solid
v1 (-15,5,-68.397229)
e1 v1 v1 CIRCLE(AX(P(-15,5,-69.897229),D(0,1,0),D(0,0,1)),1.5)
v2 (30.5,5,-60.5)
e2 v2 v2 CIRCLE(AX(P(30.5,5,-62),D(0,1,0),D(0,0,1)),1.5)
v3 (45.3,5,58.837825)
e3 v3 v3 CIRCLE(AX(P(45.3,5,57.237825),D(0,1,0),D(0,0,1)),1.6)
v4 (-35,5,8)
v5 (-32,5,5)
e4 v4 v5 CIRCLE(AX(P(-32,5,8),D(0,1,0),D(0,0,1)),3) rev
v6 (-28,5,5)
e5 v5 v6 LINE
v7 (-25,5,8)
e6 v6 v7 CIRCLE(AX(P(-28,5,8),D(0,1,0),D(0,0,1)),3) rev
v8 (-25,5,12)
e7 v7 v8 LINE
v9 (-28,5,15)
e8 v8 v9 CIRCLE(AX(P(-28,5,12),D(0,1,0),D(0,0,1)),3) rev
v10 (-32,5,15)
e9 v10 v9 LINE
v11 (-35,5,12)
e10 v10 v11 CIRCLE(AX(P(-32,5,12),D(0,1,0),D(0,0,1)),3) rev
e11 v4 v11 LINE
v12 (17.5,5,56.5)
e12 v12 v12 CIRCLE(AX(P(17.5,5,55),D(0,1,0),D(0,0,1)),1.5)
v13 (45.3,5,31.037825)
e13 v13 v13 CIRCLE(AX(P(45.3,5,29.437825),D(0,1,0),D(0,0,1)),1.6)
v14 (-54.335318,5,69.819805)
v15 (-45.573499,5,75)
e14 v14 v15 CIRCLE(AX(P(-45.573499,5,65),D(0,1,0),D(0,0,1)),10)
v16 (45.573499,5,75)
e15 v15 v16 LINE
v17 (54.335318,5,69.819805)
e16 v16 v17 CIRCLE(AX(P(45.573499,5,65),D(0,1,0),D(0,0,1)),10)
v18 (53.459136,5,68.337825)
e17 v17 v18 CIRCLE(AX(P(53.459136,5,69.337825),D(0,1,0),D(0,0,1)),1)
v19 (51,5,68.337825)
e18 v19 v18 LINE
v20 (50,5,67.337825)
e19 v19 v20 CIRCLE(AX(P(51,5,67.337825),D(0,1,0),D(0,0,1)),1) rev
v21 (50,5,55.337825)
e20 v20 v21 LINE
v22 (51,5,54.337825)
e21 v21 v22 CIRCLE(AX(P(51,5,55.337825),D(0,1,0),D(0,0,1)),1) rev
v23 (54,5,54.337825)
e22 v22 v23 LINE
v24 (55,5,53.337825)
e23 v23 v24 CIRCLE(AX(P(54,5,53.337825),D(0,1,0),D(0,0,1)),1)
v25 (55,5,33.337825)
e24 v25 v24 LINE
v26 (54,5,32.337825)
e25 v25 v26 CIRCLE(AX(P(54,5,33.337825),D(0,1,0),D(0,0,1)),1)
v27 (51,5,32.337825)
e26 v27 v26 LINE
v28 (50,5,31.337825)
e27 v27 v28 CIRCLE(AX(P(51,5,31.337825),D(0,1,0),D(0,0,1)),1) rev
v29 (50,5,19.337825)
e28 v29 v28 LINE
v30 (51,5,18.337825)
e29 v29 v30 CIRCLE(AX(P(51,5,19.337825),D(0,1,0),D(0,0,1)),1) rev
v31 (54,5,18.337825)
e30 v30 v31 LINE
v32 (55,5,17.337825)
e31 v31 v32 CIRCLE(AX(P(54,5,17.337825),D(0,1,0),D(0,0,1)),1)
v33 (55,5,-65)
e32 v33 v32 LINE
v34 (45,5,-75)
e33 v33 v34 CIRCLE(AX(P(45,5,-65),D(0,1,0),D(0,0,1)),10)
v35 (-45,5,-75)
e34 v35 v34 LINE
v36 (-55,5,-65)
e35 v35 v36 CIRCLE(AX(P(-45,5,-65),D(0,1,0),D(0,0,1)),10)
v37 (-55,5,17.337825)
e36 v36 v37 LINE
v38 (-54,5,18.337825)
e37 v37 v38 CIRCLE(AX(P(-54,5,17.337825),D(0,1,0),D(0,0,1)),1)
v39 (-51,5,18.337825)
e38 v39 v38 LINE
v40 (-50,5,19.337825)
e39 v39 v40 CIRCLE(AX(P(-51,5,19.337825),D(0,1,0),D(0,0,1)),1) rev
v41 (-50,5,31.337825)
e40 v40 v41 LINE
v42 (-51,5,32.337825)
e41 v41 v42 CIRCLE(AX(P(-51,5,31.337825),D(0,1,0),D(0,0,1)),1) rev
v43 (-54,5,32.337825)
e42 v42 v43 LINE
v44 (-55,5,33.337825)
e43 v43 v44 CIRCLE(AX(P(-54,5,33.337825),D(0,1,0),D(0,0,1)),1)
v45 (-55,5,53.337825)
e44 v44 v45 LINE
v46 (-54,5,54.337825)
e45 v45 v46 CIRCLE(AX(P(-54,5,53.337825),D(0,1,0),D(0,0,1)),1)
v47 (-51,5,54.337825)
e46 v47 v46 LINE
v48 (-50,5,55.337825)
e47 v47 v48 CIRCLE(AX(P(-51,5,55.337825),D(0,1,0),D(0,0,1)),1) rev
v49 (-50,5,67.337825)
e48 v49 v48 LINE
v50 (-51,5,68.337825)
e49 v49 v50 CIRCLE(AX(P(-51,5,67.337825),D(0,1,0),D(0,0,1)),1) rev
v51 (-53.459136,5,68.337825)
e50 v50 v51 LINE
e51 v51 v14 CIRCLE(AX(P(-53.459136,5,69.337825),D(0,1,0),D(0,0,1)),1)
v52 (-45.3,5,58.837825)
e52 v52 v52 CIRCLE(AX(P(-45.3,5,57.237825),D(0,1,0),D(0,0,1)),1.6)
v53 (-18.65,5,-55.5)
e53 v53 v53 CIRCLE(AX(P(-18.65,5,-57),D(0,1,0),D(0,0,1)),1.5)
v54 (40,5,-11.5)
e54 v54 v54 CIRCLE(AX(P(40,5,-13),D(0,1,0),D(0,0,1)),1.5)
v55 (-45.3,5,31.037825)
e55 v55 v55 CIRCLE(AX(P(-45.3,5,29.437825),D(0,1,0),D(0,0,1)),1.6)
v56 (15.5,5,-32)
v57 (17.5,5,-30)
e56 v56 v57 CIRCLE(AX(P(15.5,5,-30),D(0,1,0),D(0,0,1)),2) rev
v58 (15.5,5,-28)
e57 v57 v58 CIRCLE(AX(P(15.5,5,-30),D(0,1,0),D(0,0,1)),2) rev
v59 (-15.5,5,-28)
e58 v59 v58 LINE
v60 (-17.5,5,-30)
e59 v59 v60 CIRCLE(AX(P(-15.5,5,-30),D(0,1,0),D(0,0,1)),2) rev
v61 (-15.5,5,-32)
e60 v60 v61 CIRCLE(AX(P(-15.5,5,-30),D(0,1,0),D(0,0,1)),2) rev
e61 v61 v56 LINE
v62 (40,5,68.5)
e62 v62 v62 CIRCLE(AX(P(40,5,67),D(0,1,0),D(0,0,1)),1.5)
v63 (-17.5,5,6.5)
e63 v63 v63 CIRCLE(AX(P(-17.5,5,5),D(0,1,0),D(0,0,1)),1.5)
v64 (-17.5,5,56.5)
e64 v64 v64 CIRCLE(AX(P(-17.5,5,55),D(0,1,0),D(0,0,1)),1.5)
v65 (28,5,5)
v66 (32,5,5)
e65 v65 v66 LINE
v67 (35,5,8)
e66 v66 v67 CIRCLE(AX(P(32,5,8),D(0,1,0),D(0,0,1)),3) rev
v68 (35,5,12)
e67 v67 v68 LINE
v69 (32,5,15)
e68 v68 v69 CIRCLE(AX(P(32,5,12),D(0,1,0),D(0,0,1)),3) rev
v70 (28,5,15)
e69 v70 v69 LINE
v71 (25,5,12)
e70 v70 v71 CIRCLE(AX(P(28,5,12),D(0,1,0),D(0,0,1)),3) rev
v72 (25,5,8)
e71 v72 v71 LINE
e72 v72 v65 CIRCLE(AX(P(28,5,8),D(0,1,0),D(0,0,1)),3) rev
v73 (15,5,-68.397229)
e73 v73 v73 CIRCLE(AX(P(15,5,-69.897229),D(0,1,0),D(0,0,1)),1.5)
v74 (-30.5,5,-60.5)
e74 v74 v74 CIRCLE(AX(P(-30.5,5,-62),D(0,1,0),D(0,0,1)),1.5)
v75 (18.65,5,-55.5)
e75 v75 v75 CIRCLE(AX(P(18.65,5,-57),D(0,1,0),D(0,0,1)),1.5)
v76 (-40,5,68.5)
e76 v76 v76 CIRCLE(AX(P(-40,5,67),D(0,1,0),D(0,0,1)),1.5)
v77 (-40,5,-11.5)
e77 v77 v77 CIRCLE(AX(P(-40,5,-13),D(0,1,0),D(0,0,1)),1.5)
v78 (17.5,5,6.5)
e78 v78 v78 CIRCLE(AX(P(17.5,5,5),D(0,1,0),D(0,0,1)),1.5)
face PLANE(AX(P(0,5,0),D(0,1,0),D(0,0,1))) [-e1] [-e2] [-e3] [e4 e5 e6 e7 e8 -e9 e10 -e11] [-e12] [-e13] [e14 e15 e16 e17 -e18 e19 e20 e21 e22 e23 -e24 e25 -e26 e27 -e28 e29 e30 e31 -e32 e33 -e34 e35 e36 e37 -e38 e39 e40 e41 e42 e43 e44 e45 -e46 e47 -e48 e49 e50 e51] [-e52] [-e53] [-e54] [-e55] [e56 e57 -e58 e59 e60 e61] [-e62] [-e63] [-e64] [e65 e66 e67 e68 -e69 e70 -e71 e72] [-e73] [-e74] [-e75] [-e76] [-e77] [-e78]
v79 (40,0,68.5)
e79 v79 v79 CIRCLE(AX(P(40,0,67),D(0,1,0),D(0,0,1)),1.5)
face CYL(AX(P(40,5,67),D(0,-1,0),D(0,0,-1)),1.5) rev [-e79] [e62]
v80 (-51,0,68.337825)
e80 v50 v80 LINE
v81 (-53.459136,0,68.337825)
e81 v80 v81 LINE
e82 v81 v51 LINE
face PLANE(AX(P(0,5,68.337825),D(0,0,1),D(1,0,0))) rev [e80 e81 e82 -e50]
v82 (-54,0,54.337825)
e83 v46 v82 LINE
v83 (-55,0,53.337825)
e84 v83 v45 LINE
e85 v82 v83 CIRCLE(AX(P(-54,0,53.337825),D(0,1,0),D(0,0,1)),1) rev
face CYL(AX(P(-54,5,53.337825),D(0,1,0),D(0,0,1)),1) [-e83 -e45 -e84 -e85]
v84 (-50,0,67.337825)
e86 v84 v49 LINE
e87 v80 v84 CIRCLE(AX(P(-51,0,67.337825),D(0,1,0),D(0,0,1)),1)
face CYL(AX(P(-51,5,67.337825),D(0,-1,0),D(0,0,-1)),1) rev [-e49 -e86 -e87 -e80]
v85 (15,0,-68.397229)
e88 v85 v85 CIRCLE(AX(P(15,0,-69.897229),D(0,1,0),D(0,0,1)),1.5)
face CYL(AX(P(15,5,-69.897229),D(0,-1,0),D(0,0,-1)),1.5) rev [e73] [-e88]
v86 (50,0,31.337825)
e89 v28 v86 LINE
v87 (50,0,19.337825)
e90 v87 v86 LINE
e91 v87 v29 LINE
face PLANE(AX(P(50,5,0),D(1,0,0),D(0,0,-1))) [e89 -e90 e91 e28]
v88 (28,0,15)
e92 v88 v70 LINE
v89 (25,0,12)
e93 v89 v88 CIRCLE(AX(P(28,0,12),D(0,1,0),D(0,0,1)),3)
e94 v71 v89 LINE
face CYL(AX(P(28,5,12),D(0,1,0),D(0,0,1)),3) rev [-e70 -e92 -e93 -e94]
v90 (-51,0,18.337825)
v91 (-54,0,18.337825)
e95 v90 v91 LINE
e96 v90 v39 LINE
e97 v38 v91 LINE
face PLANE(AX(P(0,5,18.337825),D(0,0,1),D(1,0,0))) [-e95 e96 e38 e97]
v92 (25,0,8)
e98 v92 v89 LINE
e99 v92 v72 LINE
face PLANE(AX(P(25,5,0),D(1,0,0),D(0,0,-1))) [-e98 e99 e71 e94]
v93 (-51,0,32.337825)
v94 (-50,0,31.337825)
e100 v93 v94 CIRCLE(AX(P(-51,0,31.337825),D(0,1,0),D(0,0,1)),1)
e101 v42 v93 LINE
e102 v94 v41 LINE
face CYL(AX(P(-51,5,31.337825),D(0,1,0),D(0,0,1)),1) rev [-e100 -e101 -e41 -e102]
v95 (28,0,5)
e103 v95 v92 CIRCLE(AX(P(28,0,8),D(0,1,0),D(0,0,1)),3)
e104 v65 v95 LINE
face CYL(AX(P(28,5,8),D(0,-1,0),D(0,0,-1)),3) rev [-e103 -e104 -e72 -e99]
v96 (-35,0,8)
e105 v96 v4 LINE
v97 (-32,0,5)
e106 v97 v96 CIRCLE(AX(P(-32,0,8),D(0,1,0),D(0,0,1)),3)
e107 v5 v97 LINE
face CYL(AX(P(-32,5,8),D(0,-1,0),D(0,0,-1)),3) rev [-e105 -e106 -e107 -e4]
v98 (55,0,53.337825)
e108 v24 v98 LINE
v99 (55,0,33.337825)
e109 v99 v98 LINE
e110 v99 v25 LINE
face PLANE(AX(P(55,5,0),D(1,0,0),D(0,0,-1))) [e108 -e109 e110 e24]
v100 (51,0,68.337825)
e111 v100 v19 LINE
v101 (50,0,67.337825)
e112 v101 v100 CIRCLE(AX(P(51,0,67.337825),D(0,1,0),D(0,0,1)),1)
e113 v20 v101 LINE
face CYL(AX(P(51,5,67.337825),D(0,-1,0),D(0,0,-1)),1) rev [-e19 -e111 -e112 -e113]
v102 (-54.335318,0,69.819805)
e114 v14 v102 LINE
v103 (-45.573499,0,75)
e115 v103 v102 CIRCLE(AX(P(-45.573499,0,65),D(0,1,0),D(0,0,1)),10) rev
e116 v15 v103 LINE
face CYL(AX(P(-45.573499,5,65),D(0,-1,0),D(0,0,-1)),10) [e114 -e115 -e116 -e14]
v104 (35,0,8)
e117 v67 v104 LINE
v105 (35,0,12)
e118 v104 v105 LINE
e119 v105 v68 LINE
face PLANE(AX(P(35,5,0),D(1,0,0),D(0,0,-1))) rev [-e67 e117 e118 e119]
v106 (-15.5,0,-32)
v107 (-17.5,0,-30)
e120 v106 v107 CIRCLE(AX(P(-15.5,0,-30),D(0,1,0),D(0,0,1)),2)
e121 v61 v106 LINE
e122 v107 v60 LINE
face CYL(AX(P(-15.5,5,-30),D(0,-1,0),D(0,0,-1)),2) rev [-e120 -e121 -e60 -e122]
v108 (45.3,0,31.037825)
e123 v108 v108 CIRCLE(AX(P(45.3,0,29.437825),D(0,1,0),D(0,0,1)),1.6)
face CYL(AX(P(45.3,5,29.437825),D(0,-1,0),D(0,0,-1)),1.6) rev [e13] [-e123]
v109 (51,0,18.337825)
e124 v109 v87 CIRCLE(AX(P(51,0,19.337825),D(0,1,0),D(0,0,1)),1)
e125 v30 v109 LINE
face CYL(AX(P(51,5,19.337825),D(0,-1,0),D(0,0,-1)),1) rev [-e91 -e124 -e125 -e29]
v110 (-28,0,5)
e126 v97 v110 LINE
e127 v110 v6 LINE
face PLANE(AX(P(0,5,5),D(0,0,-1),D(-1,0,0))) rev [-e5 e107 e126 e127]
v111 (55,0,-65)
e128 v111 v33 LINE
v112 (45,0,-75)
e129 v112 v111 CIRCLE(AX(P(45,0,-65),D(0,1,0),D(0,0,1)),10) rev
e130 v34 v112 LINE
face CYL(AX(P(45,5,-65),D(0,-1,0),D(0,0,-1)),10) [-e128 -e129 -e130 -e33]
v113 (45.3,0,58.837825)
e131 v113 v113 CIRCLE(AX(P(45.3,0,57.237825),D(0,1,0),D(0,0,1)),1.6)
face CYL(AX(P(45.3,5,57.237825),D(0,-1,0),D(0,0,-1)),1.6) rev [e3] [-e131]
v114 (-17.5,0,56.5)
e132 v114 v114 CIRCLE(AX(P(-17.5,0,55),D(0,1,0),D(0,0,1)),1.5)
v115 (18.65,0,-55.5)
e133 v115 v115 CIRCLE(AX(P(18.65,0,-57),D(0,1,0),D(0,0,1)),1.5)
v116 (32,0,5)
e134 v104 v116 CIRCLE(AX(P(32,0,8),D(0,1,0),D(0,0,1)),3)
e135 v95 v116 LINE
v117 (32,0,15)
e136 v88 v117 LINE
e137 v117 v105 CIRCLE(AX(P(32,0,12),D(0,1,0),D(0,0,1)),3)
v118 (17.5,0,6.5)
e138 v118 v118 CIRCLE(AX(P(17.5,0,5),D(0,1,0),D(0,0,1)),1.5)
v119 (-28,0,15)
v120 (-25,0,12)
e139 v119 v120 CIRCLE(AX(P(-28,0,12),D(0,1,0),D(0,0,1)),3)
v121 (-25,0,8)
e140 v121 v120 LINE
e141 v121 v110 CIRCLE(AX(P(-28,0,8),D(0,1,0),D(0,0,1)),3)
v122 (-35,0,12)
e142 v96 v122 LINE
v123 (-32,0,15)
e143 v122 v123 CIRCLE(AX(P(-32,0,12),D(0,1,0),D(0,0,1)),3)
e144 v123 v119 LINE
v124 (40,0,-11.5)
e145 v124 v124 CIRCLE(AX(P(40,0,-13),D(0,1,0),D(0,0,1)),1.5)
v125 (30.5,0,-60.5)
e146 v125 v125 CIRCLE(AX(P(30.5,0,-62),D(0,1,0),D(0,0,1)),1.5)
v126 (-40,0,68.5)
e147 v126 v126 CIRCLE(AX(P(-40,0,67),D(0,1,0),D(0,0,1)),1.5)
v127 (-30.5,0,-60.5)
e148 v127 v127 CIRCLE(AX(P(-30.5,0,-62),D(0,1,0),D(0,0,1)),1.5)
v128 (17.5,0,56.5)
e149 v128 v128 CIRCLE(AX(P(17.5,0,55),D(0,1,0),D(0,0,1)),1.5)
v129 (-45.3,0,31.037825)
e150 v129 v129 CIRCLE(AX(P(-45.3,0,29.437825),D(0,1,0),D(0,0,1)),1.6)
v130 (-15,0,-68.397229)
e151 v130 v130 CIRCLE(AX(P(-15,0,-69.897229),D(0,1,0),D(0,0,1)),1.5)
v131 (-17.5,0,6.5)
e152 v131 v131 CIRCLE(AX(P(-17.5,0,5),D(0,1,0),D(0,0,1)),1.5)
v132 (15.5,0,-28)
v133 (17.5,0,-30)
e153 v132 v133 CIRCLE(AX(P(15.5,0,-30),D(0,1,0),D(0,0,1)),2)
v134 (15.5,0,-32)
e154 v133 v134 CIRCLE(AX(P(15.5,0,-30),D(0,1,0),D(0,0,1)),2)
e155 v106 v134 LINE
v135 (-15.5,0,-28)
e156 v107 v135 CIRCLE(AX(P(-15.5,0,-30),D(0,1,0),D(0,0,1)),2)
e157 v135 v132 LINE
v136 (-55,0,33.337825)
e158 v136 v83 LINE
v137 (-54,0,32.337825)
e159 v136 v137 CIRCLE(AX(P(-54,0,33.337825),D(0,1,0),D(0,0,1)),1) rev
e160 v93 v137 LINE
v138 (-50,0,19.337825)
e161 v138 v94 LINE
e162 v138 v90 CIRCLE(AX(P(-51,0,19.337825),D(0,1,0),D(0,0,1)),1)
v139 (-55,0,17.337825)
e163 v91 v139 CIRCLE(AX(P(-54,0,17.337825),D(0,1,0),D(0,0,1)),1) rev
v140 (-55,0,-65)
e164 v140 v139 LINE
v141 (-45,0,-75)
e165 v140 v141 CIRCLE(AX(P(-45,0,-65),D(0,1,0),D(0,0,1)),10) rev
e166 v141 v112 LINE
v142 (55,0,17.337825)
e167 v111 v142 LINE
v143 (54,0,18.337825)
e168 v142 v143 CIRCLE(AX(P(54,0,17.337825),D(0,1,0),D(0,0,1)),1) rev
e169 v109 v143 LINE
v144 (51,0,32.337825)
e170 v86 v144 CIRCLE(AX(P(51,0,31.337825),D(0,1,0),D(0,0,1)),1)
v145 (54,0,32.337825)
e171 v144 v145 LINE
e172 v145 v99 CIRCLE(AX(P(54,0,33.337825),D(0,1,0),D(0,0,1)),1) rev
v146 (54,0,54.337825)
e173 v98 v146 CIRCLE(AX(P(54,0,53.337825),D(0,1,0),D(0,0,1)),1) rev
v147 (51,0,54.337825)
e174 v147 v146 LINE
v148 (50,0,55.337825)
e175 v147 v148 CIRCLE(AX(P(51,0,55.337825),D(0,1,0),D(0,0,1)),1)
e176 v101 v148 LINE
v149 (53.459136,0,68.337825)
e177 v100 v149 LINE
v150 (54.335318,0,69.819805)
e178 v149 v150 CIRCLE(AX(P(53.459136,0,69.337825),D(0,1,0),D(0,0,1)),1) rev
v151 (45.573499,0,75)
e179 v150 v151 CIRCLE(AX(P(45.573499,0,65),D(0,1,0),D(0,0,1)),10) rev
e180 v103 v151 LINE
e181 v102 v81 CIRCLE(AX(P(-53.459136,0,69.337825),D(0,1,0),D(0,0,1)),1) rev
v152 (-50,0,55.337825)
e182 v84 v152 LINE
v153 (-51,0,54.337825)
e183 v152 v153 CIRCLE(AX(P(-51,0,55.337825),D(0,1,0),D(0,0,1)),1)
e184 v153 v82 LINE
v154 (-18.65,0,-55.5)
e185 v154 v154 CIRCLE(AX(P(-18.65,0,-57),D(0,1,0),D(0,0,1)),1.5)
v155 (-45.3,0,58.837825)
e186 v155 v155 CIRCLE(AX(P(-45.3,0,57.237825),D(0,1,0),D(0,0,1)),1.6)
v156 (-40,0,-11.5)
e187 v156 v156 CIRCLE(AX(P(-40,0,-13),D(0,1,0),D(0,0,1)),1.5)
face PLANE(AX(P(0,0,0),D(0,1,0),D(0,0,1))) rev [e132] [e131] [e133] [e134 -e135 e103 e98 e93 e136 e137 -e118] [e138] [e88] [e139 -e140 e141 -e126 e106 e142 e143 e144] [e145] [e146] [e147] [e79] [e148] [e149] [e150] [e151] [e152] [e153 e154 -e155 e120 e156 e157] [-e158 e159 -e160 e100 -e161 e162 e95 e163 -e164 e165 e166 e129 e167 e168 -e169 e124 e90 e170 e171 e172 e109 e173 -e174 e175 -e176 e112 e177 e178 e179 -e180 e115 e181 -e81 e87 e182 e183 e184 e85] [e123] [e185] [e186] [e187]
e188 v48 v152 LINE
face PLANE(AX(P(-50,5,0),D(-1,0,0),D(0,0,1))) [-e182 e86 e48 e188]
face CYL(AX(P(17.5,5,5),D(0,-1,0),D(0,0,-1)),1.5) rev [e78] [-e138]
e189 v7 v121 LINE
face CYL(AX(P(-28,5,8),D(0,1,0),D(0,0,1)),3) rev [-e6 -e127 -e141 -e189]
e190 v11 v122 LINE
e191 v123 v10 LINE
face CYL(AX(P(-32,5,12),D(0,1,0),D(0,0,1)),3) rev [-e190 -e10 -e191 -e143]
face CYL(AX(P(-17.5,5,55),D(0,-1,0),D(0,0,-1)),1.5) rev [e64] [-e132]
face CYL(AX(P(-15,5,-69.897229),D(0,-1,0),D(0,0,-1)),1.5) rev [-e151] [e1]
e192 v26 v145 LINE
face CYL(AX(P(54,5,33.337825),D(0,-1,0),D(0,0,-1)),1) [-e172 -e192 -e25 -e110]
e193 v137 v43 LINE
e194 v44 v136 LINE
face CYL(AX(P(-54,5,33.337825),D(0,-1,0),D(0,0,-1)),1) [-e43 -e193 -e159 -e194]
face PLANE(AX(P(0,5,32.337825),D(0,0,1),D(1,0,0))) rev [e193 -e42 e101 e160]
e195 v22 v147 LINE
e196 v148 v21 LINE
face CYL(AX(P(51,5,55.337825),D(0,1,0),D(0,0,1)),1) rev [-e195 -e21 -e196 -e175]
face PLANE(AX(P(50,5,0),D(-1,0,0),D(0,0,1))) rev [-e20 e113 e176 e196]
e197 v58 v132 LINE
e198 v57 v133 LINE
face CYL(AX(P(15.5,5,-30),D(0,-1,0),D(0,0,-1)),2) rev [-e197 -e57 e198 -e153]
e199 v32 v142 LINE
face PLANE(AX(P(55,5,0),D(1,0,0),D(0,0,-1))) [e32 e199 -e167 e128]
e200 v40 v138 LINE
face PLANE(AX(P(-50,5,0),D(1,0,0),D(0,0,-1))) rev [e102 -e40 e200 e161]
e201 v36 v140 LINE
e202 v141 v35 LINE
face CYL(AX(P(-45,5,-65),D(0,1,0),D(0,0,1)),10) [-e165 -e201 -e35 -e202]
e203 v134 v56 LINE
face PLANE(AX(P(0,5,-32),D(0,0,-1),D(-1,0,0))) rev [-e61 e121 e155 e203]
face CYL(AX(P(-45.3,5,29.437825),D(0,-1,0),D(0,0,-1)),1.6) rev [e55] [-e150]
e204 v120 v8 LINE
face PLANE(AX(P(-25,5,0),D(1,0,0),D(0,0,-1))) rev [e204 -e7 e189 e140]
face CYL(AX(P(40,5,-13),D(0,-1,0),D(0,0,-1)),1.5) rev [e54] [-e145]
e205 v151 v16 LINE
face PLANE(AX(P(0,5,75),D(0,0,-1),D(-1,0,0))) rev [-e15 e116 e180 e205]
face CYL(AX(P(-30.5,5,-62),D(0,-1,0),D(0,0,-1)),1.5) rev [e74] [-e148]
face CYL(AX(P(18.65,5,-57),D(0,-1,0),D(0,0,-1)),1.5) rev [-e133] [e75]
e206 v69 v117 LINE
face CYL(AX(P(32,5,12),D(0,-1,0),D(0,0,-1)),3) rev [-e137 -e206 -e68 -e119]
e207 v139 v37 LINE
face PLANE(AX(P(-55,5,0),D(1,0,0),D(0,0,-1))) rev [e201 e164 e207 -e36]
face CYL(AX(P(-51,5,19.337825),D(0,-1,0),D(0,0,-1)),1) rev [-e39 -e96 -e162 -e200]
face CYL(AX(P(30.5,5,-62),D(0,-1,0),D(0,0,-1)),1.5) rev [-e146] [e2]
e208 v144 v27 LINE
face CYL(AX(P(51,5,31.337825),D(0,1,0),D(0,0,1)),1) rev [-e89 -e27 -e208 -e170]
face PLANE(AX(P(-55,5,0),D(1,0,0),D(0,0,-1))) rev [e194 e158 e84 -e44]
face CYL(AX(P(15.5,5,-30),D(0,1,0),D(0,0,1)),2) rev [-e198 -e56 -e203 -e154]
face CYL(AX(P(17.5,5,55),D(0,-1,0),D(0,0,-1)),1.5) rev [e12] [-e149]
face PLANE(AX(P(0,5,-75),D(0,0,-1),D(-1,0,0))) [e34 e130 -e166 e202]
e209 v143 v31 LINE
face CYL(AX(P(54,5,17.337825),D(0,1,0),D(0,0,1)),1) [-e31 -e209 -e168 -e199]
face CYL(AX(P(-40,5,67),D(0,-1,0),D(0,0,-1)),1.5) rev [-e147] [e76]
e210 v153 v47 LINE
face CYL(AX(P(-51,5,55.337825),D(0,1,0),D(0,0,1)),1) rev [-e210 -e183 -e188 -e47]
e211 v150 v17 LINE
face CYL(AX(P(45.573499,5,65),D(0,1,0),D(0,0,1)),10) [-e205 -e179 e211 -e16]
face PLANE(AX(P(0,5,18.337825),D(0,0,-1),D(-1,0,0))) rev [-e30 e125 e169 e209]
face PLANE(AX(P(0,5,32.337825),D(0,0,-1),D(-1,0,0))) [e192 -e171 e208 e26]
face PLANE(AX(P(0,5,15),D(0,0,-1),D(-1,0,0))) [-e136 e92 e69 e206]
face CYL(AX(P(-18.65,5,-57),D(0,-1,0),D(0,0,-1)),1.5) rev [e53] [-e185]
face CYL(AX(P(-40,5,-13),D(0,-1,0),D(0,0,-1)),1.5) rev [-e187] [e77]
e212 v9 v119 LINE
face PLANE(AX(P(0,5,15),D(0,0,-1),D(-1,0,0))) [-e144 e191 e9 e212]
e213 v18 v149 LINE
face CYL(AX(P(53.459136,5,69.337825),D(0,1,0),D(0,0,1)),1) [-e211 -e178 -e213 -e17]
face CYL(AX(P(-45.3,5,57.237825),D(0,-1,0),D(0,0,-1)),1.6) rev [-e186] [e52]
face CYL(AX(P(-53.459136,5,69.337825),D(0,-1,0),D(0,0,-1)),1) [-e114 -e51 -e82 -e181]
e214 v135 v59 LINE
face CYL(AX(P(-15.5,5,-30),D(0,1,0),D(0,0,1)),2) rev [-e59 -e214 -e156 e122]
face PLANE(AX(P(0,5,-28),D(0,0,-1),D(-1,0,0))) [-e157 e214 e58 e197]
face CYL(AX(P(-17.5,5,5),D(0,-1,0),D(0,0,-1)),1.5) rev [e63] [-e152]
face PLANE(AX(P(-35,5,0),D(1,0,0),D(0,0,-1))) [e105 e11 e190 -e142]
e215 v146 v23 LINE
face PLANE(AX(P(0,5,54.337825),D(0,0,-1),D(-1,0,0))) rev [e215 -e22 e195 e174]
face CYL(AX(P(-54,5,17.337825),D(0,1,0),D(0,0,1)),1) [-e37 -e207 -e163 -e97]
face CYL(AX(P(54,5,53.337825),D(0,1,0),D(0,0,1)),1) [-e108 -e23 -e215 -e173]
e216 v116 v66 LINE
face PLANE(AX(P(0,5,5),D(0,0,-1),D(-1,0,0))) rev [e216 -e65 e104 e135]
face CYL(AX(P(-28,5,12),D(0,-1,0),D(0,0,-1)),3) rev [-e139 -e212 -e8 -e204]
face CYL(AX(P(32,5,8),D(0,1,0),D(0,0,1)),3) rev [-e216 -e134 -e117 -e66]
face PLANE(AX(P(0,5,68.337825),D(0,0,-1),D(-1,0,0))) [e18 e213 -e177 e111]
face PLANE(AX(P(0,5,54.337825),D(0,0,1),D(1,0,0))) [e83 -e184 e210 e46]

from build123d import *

# Parameters (mm, degrees)
SKETCH1_R           = 1.6
SKETCH1_W           = 10
SKETCH1_H           = 10
SKETCH1_R_2         = 1.5
SKETCH1_W_2         = 35
SKETCH1_H_2         = 4
BOSS_EXTRUDE1_DEPTH = 5
FILLET1_R           = 10
FILLET2_R           = 2
FILLET3_R           = 3
FILLET4_R           = 1
FILLET5_R           = 1


# Some blends are built 0.0001 mm under size
with BuildPart() as part:
    # Sketch1 → Boss-Extrude1 (new body)
    with BuildSketch(Plane(origin=(0, 0, 0), x_dir=(1, 0, 0), z_dir=(0, 1, 0))):
        Polygon((55, 75), (-55, 75), (-55, -18.337824516), (-50, -18.337824516), (-50, -32.337824516), (-55, -32.337824516), (-55, -54.337824516), (-50, -54.337824516), (-50, -68.337824516), (-55, -68.337824516), (-55, -75), (55, -75), (55, -68.337824516), (50, -68.337824516), (50, -54.337824516), (55, -54.337824516), (55, -32.337824516), (50, -32.337824516), (50, -18.337824516), (55, -18.337824516), align=None)
        with Locations(Location((-45.3, -29.437824516, 0), (0, 0, 270))):
            Circle(SKETCH1_R, mode=Mode.SUBTRACT)
        with Locations((-30, -10)):
            Rectangle(SKETCH1_W, SKETCH1_H, mode=Mode.SUBTRACT)
        with Locations(Location((-17.5, -5, 0), (0, 0, 270))):
            Circle(SKETCH1_R_2, mode=Mode.SUBTRACT)
        with Locations(Location((17.5, -5, 0), (0, 0, 270))):
            Circle(SKETCH1_R_2, mode=Mode.SUBTRACT)
        with Locations(Location((45.3, -29.437824516, 0), (0, 0, 270))):
            Circle(SKETCH1_R, mode=Mode.SUBTRACT)
        with Locations((30, -10)):
            Rectangle(SKETCH1_W, SKETCH1_H, mode=Mode.SUBTRACT)
        with Locations(Location((-40, 13, 0), (0, 0, 270))):
            Circle(SKETCH1_R_2, mode=Mode.SUBTRACT)
        with Locations((0, 30)):
            Rectangle(SKETCH1_W_2, SKETCH1_H_2, mode=Mode.SUBTRACT)
        with Locations(Location((-30.5, 62, 0), (0, 0, 270))):
            Circle(SKETCH1_R_2, mode=Mode.SUBTRACT)
        with Locations(Location((-18.65, 57, 0), (0, 0, 270))):
            Circle(SKETCH1_R_2, mode=Mode.SUBTRACT)
        with Locations(Location((-15, 69.897229132, 0), (0, 0, 270))):
            Circle(SKETCH1_R_2, mode=Mode.SUBTRACT)
        with Locations(Location((40, 13, 0), (0, 0, 270))):
            Circle(SKETCH1_R_2, mode=Mode.SUBTRACT)
        with Locations(Location((18.65, 57, 0), (0, 0, 270))):
            Circle(SKETCH1_R_2, mode=Mode.SUBTRACT)
        with Locations(Location((15, 69.897229132, 0), (0, 0, 270))):
            Circle(SKETCH1_R_2, mode=Mode.SUBTRACT)
        with Locations(Location((30.5, 62, 0), (0, 0, 270))):
            Circle(SKETCH1_R_2, mode=Mode.SUBTRACT)
        with Locations(Location((-45.3, -57.237824516, 0), (0, 0, 270))):
            Circle(SKETCH1_R, mode=Mode.SUBTRACT)
        with Locations(Location((-40, -67, 0), (0, 0, 270))):
            Circle(SKETCH1_R_2, mode=Mode.SUBTRACT)
        with Locations(Location((-17.5, -55, 0), (0, 0, 270))):
            Circle(SKETCH1_R_2, mode=Mode.SUBTRACT)
        with Locations(Location((17.5, -55, 0), (0, 0, 270))):
            Circle(SKETCH1_R_2, mode=Mode.SUBTRACT)
        with Locations(Location((40, -67, 0), (0, 0, 270))):
            Circle(SKETCH1_R_2, mode=Mode.SUBTRACT)
        with Locations(Location((45.3, -57.237824516, 0), (0, 0, 270))):
            Circle(SKETCH1_R, mode=Mode.SUBTRACT)
    extrude(amount=BOSS_EXTRUDE1_DEPTH)

    # Fillet1
    # the kernel refuses this fillet: 10 mm, written as the material it takes off along each edge
    with BuildSketch(Plane(origin=(55, -23.566253348, 75), x_dir=(-1, 0, 0), z_dir=(0, 1, 0))) as fillet1_piece_1:
        with BuildLine():
            CenterArc((9.426501339, -10), FILLET1_R, 90, 70.501483543)
            Line((0, -6.662175484), (-0.188530027, -6.595418994))
            ThreePointArc((-0.188530027, -6.595418994), (-0.2, -3.331087742), (-0.2, 0))
            Line((-0.2, 0), (0, 0.2))
            Line((0, 0.2), (9.426501339, 0.2))
            Line((9.426501339, 0.2), (9.426501339, 0))
        make_face()
    extrude(amount=52.132506697, mode=Mode.SUBTRACT)
    with BuildSketch(Plane(origin=(-55, -23.566253348, 75), x_dir=(0, 0, -1), z_dir=(0, 1, 0))) as fillet1_piece_2:
        with BuildLine():
            CenterArc((10, -9.426501339), FILLET1_R, 109.498516457, 70.501483543)
            Line((0, -9.426501339), (-0.2, -9.426501339))
            Line((-0.2, -9.426501339), (-0.2, 0))
            Line((-0.2, 0), (0, 0.2))
            ThreePointArc((0, 0.2), (3.331087742, 0.2), (6.595418994, 0.188530027))
            Line((6.595418994, 0.188530027), (6.662175484, 0))
        make_face()
    extrude(amount=52.132506697, mode=Mode.SUBTRACT)
    with BuildSketch(Plane(origin=(-55, -25, -75), x_dir=(1, 0, 0), z_dir=(0, 1, 0)), Plane(origin=(55, -25, -75), x_dir=(0, 0, 1), z_dir=(0, 1, 0))) as fillet1_piece_3:
        with BuildLine():
            CenterArc((FILLET1_R, -FILLET1_R), FILLET1_R, 90, 90)
            Line((0, -FILLET1_R), (-FILLET1_R * 0.02, -FILLET1_R))
            Line((-FILLET1_R * 0.02, -FILLET1_R), (-FILLET1_R * 0.02, FILLET1_R * 0.02))
            Line((-FILLET1_R * 0.02, FILLET1_R * 0.02), (FILLET1_R, FILLET1_R * 0.02))
            Line((FILLET1_R, FILLET1_R * 0.02), (FILLET1_R, 0))
        make_face()
    extrude(amount=55, mode=Mode.SUBTRACT)

    # Fillet2
    fillet2_edges = [part.edges().sort_by_distance(p)[0] for p in [
        (-17.5, 2.5, -28),
        (-17.5, 2.5, -32),
        (17.5, 2.5, -28),
        (17.5, 2.5, -32),
    ]]
    fillet(fillet2_edges, radius=FILLET2_R - 0.0001)  # a hair under: the kernel refuses the full size

    # Fillet3
    fillet3_edges = [part.edges().sort_by_distance(p)[0] for p in [
        (25, 2.5, 5),
        (25, 2.5, 15),
        (35, 2.5, 15),
        (35, 2.5, 5),
        (-35, 2.5, 5),
        (-35, 2.5, 15),
        (-25, 2.5, 15),
        (-25, 2.5, 5),
    ]]
    fillet(fillet3_edges, radius=FILLET3_R)

    # Fillet4
    fillet4_edges = [part.edges().sort_by_distance(p)[0] for p in [
        (-55, 2.5, 68.337824516),
        (-50, 2.5, 68.337824516),
        (-50, 2.5, 54.337824516),
        (-55, 2.5, 54.337824516),
        (-55, 2.5, 32.337824516),
        (-50, 2.5, 32.337824516),
        (-50, 2.5, 18.337824516),
        (-55, 2.5, 18.337824516),
    ]]
    fillet(fillet4_edges, radius=FILLET4_R)

    # Fillet5
    fillet5_edges = [part.edges().sort_by_distance(p)[0] for p in [
        (55, 2.5, 54.337824516),
        (50, 2.5, 54.337824516),
        (50, 2.5, 68.337824516),
        (55, 2.5, 68.337824516),
        (55, 2.5, 18.337824516),
        (50, 2.5, 18.337824516),
        (50, 2.5, 32.337824516),
        (55, 2.5, 32.337824516),
    ]]
    fillet(fillet5_edges, radius=FILLET5_R)


solid = part.part
